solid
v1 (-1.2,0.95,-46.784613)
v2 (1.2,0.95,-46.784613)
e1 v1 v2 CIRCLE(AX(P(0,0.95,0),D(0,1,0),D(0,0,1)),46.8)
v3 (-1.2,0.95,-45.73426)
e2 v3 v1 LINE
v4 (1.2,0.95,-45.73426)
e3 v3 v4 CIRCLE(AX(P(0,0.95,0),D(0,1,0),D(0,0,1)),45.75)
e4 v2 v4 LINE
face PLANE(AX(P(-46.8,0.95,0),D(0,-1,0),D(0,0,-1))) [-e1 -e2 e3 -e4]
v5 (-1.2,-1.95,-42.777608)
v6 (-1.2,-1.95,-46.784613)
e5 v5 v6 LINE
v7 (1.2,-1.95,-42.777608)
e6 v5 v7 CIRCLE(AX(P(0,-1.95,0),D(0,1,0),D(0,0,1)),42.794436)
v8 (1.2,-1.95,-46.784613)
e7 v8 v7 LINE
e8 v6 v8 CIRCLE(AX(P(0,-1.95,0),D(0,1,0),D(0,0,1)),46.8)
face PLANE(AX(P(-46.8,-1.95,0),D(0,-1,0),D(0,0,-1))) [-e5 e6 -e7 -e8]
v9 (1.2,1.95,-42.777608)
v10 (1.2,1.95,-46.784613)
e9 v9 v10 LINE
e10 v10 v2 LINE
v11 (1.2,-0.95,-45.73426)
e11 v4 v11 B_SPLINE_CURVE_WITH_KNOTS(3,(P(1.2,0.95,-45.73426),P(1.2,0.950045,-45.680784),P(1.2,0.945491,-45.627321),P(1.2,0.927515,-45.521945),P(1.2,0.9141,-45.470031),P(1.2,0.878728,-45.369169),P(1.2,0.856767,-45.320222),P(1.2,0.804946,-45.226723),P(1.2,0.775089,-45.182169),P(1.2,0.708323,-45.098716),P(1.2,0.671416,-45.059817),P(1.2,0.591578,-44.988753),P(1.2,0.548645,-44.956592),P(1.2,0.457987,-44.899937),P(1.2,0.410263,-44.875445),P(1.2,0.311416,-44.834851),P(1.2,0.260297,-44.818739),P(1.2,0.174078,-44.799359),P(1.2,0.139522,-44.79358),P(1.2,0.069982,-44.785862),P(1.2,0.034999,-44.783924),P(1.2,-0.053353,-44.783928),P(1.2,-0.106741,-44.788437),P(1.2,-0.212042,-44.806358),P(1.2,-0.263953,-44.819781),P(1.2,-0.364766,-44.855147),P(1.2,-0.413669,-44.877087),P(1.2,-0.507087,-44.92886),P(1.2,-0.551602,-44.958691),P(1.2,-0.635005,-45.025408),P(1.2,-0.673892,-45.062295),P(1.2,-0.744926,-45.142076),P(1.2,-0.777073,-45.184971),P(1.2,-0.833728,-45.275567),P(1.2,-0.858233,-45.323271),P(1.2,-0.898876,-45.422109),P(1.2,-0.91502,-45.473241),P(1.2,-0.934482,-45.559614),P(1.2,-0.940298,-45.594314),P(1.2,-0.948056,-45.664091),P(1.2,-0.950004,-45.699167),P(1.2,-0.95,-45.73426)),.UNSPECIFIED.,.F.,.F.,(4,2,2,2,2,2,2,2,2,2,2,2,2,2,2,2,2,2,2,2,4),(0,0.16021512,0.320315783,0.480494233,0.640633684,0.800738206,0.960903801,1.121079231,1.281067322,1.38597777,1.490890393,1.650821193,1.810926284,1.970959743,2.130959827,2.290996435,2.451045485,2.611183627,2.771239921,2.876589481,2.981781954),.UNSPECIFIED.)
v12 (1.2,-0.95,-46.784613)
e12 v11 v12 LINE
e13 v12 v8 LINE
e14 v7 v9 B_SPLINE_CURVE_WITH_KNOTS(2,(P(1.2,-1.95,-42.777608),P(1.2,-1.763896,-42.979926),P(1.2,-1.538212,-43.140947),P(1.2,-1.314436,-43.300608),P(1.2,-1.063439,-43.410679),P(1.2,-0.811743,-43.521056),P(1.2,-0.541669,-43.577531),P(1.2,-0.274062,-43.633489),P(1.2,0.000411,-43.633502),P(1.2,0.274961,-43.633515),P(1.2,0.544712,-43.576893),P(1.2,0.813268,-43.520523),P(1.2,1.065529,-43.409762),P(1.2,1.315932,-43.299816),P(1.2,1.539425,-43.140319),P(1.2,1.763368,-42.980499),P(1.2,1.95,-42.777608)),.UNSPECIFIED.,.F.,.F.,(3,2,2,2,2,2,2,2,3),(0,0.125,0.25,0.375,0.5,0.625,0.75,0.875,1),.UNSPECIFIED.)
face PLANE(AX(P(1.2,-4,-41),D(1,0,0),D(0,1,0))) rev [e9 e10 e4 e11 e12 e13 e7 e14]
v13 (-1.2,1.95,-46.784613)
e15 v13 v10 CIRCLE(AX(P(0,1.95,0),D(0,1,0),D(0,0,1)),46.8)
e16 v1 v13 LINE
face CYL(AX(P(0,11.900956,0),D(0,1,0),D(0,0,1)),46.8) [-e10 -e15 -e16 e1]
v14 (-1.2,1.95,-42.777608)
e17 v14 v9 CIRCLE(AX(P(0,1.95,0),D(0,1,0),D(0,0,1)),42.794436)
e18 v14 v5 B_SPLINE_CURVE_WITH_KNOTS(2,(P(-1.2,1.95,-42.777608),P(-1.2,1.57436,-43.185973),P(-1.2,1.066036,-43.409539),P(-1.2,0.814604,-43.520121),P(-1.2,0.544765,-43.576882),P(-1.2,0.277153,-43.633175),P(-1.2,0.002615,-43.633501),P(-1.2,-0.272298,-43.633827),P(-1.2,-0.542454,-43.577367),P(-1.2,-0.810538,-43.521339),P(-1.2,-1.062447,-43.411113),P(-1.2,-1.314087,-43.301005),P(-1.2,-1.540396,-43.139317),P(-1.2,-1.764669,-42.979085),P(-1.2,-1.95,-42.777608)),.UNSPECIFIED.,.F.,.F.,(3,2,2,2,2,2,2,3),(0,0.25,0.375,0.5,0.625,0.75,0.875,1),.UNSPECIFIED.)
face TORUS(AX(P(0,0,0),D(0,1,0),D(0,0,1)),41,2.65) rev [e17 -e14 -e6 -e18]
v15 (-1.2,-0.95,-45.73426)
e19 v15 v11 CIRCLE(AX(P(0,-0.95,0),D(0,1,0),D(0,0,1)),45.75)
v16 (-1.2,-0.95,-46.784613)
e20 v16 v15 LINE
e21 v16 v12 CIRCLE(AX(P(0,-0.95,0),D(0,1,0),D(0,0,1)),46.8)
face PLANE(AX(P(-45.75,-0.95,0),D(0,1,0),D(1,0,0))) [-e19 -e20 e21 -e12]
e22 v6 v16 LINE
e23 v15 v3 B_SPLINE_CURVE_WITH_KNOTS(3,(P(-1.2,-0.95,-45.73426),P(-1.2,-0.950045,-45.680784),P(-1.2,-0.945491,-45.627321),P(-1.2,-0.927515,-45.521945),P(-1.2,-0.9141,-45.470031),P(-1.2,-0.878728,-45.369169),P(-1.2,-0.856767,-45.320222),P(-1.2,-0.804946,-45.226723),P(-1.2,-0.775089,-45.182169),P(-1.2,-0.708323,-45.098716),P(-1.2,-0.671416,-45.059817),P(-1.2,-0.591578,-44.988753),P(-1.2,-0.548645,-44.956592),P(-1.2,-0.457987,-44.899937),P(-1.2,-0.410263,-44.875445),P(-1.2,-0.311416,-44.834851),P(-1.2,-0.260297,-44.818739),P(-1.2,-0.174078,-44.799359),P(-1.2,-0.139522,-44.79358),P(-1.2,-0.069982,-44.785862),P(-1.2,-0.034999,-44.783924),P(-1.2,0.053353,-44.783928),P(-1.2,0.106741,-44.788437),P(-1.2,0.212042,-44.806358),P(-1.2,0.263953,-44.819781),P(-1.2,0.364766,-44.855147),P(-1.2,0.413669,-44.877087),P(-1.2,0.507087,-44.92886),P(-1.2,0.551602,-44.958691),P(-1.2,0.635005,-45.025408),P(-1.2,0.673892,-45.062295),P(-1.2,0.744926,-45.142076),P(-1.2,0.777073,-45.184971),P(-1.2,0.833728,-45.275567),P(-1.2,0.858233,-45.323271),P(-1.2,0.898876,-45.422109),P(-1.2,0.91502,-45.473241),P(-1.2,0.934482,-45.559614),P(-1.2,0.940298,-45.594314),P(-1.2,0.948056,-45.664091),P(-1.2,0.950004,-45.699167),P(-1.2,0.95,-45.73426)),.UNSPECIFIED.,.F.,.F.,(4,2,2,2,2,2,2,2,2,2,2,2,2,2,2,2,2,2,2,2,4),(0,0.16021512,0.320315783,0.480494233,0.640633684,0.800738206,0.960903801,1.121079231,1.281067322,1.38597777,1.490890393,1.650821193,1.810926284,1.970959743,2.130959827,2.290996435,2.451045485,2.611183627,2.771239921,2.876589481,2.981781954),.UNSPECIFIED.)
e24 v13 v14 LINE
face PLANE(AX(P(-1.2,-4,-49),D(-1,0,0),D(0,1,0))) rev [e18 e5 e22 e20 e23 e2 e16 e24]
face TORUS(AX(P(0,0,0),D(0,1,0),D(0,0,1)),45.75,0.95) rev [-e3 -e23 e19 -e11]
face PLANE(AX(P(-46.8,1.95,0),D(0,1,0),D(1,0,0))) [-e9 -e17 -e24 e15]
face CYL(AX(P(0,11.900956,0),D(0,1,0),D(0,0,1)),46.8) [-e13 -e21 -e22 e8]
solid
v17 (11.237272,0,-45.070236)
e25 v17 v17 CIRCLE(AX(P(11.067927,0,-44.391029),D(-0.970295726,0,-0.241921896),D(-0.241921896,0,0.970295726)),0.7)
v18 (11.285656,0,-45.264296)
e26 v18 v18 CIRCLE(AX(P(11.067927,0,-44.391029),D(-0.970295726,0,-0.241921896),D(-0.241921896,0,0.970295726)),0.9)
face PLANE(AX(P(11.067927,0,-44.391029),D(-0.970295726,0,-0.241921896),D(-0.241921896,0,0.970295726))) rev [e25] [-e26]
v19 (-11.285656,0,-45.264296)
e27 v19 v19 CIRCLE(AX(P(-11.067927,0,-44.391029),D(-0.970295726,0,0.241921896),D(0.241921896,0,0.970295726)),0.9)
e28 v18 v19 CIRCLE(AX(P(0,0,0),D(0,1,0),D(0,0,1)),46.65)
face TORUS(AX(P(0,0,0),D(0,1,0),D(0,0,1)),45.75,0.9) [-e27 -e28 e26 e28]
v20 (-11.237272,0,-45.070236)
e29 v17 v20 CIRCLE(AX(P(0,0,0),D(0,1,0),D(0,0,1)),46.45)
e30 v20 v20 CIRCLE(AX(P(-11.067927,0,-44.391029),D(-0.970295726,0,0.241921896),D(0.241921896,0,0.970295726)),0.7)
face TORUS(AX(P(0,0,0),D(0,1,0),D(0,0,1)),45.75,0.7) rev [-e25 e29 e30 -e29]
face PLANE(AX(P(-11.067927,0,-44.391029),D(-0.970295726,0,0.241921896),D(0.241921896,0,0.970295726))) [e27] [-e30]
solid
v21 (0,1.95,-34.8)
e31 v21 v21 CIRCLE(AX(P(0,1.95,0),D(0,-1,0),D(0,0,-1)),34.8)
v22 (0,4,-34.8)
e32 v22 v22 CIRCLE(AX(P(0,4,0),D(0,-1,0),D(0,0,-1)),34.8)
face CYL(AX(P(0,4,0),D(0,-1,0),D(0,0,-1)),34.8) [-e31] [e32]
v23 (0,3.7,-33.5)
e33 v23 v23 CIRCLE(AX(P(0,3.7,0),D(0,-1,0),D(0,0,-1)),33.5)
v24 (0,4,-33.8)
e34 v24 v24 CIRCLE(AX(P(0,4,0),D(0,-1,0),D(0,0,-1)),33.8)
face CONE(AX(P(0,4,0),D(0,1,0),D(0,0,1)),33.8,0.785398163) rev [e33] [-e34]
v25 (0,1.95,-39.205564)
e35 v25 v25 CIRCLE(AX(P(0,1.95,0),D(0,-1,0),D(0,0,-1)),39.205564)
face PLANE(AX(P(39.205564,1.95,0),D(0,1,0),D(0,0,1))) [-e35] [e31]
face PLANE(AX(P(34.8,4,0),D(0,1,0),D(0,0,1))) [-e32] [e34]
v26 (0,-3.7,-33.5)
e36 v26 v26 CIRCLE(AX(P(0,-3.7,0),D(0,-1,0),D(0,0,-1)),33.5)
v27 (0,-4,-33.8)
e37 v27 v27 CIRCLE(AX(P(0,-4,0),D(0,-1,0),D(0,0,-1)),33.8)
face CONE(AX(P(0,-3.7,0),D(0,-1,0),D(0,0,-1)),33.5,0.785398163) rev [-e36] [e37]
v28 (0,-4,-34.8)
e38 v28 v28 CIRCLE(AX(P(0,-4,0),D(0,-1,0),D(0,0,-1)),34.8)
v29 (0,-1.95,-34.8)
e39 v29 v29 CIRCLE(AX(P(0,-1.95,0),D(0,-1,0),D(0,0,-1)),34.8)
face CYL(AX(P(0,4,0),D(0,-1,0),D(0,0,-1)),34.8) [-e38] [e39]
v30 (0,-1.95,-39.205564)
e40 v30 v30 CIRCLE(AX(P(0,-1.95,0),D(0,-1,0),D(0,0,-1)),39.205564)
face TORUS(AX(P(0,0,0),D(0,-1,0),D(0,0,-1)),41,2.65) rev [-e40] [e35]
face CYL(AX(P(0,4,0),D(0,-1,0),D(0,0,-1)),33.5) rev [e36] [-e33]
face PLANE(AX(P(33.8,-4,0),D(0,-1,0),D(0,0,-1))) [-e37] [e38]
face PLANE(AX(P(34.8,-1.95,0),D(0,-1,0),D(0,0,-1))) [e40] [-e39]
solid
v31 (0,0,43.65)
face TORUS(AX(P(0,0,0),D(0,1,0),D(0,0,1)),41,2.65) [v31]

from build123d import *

# Parameters (mm, degrees)
SKETCH5_R                = 2.65
CUT_THICKEN1_START       = -1.2
CUT_THICKEN1_2_OUTLINE_W = 3.9
CUT_THICKEN1_2_OUTLINE_H = 7
CUT_THICKEN1_2_DEPTH     = 2.4
SKETCH12_R               = 0.9
SKETCH12_R_2             = 0.7
REVOLVE4_ANGLE           = 28


with BuildPart() as part:
    # Sketch5 → Revolve2 (revolve)
    with BuildSketch(Plane(origin=(0, 0, 0), x_dir=(-1, 0, 0), z_dir=(0, 0, -1)), mode=Mode.PRIVATE) as revolve2_sk:
        with Locations((-41, 0)):
            Circle(SKETCH5_R)
    revolve(revolve2_sk.sketch.rotate(Axis((0, -2.65, 0), (0, 1, 0)), 270), axis=Axis((0, -2.65, 0), (0, 1, 0)))


with BuildPart() as body_2:
    # Sketch7 → Revolve3 (revolve)
    with BuildSketch(Plane.XY, mode=Mode.PRIVATE) as revolve3_sk:
        with BuildLine():
            Line((34.8, 4), (33.8, 4))
            Line((33.8, 4), (33.5, 3.7))
            Line((33.5, 3.7), (33.5, -3.7))
            Line((33.5, -3.7), (33.8, -4))
            Line((33.8, -4), (34.8, -4))
            Line((34.8, -4), (34.8, -1.95))
            Line((34.8, -1.95), (39.205564156, -1.95))
            ThreePointArc((39.205564156, -1.95), (38.35, 0), (39.205564156, 1.95))
            Line((39.205564156, 1.95), (34.8, 1.95))
            Line((34.8, 1.95), (34.8, 4))
        make_face()
    revolve(revolve3_sk.sketch.rotate(Axis((0, 4, 0), (0, -1, 0)), 270), axis=Axis((0, 4, 0), (0, -1, 0)))


with BuildPart() as body_3:
    # Cut-Thicken1: read off the stored shape, not the designer's step
    # Cut-Thicken1 outline → Cut-Thicken1 (revolve)
    with BuildSketch(Plane.XY):
        with BuildLine():
            Line((42.794435844, -1.95), (46.8, -1.95))
            Line((46.8, -1.95), (46.8, -0.95))
            Line((46.8, -0.95), (45.75, -0.95))
            ThreePointArc((45.75, -0.95), (44.8, 0), (45.75, 0.95))
            Line((45.75, 0.95), (46.8, 0.95))
            Line((46.8, 0.95), (46.8, 1.95))
            Line((46.8, 1.95), (42.794435844, 1.95))
            ThreePointArc((42.794435844, 1.95), (43.65, 0), (42.794435844, -1.95))
        make_face()
    revolve(axis=Axis((0, 0, 0), (0, 1, 0)))

    # Cut-Thicken1 2 outline → Cut-Thicken1 2 (cut)
    with BuildSketch(Plane.YZ.offset(CUT_THICKEN1_START)):
        with Locations((0, -44.5)):
            Rectangle(CUT_THICKEN1_2_OUTLINE_W, CUT_THICKEN1_2_OUTLINE_H)
    extrude(amount=CUT_THICKEN1_2_DEPTH, mode=Mode.SUBTRACT)


with BuildPart() as body_4:
    # Sketch12 → Revolve4 (revolve)
    with BuildSketch(Plane(origin=(0, 0, 0), x_dir=(0.2419218955996686, 0, 0.9702957262759964), z_dir=(-0.9702957262759964, 0, 0.2419218955996686))):
        with Locations((-45.75, 0)):
            Circle(SKETCH12_R)
        with Locations((-45.75, 0)):
            Circle(SKETCH12_R_2, mode=Mode.SUBTRACT)
    revolve(axis=Axis((0, -0.9, 0), (0, -1, 0)), revolution_arc=REVOLVE4_ANGLE)


solid = Compound([part.part, body_2.part, body_3.part, body_4.part])
